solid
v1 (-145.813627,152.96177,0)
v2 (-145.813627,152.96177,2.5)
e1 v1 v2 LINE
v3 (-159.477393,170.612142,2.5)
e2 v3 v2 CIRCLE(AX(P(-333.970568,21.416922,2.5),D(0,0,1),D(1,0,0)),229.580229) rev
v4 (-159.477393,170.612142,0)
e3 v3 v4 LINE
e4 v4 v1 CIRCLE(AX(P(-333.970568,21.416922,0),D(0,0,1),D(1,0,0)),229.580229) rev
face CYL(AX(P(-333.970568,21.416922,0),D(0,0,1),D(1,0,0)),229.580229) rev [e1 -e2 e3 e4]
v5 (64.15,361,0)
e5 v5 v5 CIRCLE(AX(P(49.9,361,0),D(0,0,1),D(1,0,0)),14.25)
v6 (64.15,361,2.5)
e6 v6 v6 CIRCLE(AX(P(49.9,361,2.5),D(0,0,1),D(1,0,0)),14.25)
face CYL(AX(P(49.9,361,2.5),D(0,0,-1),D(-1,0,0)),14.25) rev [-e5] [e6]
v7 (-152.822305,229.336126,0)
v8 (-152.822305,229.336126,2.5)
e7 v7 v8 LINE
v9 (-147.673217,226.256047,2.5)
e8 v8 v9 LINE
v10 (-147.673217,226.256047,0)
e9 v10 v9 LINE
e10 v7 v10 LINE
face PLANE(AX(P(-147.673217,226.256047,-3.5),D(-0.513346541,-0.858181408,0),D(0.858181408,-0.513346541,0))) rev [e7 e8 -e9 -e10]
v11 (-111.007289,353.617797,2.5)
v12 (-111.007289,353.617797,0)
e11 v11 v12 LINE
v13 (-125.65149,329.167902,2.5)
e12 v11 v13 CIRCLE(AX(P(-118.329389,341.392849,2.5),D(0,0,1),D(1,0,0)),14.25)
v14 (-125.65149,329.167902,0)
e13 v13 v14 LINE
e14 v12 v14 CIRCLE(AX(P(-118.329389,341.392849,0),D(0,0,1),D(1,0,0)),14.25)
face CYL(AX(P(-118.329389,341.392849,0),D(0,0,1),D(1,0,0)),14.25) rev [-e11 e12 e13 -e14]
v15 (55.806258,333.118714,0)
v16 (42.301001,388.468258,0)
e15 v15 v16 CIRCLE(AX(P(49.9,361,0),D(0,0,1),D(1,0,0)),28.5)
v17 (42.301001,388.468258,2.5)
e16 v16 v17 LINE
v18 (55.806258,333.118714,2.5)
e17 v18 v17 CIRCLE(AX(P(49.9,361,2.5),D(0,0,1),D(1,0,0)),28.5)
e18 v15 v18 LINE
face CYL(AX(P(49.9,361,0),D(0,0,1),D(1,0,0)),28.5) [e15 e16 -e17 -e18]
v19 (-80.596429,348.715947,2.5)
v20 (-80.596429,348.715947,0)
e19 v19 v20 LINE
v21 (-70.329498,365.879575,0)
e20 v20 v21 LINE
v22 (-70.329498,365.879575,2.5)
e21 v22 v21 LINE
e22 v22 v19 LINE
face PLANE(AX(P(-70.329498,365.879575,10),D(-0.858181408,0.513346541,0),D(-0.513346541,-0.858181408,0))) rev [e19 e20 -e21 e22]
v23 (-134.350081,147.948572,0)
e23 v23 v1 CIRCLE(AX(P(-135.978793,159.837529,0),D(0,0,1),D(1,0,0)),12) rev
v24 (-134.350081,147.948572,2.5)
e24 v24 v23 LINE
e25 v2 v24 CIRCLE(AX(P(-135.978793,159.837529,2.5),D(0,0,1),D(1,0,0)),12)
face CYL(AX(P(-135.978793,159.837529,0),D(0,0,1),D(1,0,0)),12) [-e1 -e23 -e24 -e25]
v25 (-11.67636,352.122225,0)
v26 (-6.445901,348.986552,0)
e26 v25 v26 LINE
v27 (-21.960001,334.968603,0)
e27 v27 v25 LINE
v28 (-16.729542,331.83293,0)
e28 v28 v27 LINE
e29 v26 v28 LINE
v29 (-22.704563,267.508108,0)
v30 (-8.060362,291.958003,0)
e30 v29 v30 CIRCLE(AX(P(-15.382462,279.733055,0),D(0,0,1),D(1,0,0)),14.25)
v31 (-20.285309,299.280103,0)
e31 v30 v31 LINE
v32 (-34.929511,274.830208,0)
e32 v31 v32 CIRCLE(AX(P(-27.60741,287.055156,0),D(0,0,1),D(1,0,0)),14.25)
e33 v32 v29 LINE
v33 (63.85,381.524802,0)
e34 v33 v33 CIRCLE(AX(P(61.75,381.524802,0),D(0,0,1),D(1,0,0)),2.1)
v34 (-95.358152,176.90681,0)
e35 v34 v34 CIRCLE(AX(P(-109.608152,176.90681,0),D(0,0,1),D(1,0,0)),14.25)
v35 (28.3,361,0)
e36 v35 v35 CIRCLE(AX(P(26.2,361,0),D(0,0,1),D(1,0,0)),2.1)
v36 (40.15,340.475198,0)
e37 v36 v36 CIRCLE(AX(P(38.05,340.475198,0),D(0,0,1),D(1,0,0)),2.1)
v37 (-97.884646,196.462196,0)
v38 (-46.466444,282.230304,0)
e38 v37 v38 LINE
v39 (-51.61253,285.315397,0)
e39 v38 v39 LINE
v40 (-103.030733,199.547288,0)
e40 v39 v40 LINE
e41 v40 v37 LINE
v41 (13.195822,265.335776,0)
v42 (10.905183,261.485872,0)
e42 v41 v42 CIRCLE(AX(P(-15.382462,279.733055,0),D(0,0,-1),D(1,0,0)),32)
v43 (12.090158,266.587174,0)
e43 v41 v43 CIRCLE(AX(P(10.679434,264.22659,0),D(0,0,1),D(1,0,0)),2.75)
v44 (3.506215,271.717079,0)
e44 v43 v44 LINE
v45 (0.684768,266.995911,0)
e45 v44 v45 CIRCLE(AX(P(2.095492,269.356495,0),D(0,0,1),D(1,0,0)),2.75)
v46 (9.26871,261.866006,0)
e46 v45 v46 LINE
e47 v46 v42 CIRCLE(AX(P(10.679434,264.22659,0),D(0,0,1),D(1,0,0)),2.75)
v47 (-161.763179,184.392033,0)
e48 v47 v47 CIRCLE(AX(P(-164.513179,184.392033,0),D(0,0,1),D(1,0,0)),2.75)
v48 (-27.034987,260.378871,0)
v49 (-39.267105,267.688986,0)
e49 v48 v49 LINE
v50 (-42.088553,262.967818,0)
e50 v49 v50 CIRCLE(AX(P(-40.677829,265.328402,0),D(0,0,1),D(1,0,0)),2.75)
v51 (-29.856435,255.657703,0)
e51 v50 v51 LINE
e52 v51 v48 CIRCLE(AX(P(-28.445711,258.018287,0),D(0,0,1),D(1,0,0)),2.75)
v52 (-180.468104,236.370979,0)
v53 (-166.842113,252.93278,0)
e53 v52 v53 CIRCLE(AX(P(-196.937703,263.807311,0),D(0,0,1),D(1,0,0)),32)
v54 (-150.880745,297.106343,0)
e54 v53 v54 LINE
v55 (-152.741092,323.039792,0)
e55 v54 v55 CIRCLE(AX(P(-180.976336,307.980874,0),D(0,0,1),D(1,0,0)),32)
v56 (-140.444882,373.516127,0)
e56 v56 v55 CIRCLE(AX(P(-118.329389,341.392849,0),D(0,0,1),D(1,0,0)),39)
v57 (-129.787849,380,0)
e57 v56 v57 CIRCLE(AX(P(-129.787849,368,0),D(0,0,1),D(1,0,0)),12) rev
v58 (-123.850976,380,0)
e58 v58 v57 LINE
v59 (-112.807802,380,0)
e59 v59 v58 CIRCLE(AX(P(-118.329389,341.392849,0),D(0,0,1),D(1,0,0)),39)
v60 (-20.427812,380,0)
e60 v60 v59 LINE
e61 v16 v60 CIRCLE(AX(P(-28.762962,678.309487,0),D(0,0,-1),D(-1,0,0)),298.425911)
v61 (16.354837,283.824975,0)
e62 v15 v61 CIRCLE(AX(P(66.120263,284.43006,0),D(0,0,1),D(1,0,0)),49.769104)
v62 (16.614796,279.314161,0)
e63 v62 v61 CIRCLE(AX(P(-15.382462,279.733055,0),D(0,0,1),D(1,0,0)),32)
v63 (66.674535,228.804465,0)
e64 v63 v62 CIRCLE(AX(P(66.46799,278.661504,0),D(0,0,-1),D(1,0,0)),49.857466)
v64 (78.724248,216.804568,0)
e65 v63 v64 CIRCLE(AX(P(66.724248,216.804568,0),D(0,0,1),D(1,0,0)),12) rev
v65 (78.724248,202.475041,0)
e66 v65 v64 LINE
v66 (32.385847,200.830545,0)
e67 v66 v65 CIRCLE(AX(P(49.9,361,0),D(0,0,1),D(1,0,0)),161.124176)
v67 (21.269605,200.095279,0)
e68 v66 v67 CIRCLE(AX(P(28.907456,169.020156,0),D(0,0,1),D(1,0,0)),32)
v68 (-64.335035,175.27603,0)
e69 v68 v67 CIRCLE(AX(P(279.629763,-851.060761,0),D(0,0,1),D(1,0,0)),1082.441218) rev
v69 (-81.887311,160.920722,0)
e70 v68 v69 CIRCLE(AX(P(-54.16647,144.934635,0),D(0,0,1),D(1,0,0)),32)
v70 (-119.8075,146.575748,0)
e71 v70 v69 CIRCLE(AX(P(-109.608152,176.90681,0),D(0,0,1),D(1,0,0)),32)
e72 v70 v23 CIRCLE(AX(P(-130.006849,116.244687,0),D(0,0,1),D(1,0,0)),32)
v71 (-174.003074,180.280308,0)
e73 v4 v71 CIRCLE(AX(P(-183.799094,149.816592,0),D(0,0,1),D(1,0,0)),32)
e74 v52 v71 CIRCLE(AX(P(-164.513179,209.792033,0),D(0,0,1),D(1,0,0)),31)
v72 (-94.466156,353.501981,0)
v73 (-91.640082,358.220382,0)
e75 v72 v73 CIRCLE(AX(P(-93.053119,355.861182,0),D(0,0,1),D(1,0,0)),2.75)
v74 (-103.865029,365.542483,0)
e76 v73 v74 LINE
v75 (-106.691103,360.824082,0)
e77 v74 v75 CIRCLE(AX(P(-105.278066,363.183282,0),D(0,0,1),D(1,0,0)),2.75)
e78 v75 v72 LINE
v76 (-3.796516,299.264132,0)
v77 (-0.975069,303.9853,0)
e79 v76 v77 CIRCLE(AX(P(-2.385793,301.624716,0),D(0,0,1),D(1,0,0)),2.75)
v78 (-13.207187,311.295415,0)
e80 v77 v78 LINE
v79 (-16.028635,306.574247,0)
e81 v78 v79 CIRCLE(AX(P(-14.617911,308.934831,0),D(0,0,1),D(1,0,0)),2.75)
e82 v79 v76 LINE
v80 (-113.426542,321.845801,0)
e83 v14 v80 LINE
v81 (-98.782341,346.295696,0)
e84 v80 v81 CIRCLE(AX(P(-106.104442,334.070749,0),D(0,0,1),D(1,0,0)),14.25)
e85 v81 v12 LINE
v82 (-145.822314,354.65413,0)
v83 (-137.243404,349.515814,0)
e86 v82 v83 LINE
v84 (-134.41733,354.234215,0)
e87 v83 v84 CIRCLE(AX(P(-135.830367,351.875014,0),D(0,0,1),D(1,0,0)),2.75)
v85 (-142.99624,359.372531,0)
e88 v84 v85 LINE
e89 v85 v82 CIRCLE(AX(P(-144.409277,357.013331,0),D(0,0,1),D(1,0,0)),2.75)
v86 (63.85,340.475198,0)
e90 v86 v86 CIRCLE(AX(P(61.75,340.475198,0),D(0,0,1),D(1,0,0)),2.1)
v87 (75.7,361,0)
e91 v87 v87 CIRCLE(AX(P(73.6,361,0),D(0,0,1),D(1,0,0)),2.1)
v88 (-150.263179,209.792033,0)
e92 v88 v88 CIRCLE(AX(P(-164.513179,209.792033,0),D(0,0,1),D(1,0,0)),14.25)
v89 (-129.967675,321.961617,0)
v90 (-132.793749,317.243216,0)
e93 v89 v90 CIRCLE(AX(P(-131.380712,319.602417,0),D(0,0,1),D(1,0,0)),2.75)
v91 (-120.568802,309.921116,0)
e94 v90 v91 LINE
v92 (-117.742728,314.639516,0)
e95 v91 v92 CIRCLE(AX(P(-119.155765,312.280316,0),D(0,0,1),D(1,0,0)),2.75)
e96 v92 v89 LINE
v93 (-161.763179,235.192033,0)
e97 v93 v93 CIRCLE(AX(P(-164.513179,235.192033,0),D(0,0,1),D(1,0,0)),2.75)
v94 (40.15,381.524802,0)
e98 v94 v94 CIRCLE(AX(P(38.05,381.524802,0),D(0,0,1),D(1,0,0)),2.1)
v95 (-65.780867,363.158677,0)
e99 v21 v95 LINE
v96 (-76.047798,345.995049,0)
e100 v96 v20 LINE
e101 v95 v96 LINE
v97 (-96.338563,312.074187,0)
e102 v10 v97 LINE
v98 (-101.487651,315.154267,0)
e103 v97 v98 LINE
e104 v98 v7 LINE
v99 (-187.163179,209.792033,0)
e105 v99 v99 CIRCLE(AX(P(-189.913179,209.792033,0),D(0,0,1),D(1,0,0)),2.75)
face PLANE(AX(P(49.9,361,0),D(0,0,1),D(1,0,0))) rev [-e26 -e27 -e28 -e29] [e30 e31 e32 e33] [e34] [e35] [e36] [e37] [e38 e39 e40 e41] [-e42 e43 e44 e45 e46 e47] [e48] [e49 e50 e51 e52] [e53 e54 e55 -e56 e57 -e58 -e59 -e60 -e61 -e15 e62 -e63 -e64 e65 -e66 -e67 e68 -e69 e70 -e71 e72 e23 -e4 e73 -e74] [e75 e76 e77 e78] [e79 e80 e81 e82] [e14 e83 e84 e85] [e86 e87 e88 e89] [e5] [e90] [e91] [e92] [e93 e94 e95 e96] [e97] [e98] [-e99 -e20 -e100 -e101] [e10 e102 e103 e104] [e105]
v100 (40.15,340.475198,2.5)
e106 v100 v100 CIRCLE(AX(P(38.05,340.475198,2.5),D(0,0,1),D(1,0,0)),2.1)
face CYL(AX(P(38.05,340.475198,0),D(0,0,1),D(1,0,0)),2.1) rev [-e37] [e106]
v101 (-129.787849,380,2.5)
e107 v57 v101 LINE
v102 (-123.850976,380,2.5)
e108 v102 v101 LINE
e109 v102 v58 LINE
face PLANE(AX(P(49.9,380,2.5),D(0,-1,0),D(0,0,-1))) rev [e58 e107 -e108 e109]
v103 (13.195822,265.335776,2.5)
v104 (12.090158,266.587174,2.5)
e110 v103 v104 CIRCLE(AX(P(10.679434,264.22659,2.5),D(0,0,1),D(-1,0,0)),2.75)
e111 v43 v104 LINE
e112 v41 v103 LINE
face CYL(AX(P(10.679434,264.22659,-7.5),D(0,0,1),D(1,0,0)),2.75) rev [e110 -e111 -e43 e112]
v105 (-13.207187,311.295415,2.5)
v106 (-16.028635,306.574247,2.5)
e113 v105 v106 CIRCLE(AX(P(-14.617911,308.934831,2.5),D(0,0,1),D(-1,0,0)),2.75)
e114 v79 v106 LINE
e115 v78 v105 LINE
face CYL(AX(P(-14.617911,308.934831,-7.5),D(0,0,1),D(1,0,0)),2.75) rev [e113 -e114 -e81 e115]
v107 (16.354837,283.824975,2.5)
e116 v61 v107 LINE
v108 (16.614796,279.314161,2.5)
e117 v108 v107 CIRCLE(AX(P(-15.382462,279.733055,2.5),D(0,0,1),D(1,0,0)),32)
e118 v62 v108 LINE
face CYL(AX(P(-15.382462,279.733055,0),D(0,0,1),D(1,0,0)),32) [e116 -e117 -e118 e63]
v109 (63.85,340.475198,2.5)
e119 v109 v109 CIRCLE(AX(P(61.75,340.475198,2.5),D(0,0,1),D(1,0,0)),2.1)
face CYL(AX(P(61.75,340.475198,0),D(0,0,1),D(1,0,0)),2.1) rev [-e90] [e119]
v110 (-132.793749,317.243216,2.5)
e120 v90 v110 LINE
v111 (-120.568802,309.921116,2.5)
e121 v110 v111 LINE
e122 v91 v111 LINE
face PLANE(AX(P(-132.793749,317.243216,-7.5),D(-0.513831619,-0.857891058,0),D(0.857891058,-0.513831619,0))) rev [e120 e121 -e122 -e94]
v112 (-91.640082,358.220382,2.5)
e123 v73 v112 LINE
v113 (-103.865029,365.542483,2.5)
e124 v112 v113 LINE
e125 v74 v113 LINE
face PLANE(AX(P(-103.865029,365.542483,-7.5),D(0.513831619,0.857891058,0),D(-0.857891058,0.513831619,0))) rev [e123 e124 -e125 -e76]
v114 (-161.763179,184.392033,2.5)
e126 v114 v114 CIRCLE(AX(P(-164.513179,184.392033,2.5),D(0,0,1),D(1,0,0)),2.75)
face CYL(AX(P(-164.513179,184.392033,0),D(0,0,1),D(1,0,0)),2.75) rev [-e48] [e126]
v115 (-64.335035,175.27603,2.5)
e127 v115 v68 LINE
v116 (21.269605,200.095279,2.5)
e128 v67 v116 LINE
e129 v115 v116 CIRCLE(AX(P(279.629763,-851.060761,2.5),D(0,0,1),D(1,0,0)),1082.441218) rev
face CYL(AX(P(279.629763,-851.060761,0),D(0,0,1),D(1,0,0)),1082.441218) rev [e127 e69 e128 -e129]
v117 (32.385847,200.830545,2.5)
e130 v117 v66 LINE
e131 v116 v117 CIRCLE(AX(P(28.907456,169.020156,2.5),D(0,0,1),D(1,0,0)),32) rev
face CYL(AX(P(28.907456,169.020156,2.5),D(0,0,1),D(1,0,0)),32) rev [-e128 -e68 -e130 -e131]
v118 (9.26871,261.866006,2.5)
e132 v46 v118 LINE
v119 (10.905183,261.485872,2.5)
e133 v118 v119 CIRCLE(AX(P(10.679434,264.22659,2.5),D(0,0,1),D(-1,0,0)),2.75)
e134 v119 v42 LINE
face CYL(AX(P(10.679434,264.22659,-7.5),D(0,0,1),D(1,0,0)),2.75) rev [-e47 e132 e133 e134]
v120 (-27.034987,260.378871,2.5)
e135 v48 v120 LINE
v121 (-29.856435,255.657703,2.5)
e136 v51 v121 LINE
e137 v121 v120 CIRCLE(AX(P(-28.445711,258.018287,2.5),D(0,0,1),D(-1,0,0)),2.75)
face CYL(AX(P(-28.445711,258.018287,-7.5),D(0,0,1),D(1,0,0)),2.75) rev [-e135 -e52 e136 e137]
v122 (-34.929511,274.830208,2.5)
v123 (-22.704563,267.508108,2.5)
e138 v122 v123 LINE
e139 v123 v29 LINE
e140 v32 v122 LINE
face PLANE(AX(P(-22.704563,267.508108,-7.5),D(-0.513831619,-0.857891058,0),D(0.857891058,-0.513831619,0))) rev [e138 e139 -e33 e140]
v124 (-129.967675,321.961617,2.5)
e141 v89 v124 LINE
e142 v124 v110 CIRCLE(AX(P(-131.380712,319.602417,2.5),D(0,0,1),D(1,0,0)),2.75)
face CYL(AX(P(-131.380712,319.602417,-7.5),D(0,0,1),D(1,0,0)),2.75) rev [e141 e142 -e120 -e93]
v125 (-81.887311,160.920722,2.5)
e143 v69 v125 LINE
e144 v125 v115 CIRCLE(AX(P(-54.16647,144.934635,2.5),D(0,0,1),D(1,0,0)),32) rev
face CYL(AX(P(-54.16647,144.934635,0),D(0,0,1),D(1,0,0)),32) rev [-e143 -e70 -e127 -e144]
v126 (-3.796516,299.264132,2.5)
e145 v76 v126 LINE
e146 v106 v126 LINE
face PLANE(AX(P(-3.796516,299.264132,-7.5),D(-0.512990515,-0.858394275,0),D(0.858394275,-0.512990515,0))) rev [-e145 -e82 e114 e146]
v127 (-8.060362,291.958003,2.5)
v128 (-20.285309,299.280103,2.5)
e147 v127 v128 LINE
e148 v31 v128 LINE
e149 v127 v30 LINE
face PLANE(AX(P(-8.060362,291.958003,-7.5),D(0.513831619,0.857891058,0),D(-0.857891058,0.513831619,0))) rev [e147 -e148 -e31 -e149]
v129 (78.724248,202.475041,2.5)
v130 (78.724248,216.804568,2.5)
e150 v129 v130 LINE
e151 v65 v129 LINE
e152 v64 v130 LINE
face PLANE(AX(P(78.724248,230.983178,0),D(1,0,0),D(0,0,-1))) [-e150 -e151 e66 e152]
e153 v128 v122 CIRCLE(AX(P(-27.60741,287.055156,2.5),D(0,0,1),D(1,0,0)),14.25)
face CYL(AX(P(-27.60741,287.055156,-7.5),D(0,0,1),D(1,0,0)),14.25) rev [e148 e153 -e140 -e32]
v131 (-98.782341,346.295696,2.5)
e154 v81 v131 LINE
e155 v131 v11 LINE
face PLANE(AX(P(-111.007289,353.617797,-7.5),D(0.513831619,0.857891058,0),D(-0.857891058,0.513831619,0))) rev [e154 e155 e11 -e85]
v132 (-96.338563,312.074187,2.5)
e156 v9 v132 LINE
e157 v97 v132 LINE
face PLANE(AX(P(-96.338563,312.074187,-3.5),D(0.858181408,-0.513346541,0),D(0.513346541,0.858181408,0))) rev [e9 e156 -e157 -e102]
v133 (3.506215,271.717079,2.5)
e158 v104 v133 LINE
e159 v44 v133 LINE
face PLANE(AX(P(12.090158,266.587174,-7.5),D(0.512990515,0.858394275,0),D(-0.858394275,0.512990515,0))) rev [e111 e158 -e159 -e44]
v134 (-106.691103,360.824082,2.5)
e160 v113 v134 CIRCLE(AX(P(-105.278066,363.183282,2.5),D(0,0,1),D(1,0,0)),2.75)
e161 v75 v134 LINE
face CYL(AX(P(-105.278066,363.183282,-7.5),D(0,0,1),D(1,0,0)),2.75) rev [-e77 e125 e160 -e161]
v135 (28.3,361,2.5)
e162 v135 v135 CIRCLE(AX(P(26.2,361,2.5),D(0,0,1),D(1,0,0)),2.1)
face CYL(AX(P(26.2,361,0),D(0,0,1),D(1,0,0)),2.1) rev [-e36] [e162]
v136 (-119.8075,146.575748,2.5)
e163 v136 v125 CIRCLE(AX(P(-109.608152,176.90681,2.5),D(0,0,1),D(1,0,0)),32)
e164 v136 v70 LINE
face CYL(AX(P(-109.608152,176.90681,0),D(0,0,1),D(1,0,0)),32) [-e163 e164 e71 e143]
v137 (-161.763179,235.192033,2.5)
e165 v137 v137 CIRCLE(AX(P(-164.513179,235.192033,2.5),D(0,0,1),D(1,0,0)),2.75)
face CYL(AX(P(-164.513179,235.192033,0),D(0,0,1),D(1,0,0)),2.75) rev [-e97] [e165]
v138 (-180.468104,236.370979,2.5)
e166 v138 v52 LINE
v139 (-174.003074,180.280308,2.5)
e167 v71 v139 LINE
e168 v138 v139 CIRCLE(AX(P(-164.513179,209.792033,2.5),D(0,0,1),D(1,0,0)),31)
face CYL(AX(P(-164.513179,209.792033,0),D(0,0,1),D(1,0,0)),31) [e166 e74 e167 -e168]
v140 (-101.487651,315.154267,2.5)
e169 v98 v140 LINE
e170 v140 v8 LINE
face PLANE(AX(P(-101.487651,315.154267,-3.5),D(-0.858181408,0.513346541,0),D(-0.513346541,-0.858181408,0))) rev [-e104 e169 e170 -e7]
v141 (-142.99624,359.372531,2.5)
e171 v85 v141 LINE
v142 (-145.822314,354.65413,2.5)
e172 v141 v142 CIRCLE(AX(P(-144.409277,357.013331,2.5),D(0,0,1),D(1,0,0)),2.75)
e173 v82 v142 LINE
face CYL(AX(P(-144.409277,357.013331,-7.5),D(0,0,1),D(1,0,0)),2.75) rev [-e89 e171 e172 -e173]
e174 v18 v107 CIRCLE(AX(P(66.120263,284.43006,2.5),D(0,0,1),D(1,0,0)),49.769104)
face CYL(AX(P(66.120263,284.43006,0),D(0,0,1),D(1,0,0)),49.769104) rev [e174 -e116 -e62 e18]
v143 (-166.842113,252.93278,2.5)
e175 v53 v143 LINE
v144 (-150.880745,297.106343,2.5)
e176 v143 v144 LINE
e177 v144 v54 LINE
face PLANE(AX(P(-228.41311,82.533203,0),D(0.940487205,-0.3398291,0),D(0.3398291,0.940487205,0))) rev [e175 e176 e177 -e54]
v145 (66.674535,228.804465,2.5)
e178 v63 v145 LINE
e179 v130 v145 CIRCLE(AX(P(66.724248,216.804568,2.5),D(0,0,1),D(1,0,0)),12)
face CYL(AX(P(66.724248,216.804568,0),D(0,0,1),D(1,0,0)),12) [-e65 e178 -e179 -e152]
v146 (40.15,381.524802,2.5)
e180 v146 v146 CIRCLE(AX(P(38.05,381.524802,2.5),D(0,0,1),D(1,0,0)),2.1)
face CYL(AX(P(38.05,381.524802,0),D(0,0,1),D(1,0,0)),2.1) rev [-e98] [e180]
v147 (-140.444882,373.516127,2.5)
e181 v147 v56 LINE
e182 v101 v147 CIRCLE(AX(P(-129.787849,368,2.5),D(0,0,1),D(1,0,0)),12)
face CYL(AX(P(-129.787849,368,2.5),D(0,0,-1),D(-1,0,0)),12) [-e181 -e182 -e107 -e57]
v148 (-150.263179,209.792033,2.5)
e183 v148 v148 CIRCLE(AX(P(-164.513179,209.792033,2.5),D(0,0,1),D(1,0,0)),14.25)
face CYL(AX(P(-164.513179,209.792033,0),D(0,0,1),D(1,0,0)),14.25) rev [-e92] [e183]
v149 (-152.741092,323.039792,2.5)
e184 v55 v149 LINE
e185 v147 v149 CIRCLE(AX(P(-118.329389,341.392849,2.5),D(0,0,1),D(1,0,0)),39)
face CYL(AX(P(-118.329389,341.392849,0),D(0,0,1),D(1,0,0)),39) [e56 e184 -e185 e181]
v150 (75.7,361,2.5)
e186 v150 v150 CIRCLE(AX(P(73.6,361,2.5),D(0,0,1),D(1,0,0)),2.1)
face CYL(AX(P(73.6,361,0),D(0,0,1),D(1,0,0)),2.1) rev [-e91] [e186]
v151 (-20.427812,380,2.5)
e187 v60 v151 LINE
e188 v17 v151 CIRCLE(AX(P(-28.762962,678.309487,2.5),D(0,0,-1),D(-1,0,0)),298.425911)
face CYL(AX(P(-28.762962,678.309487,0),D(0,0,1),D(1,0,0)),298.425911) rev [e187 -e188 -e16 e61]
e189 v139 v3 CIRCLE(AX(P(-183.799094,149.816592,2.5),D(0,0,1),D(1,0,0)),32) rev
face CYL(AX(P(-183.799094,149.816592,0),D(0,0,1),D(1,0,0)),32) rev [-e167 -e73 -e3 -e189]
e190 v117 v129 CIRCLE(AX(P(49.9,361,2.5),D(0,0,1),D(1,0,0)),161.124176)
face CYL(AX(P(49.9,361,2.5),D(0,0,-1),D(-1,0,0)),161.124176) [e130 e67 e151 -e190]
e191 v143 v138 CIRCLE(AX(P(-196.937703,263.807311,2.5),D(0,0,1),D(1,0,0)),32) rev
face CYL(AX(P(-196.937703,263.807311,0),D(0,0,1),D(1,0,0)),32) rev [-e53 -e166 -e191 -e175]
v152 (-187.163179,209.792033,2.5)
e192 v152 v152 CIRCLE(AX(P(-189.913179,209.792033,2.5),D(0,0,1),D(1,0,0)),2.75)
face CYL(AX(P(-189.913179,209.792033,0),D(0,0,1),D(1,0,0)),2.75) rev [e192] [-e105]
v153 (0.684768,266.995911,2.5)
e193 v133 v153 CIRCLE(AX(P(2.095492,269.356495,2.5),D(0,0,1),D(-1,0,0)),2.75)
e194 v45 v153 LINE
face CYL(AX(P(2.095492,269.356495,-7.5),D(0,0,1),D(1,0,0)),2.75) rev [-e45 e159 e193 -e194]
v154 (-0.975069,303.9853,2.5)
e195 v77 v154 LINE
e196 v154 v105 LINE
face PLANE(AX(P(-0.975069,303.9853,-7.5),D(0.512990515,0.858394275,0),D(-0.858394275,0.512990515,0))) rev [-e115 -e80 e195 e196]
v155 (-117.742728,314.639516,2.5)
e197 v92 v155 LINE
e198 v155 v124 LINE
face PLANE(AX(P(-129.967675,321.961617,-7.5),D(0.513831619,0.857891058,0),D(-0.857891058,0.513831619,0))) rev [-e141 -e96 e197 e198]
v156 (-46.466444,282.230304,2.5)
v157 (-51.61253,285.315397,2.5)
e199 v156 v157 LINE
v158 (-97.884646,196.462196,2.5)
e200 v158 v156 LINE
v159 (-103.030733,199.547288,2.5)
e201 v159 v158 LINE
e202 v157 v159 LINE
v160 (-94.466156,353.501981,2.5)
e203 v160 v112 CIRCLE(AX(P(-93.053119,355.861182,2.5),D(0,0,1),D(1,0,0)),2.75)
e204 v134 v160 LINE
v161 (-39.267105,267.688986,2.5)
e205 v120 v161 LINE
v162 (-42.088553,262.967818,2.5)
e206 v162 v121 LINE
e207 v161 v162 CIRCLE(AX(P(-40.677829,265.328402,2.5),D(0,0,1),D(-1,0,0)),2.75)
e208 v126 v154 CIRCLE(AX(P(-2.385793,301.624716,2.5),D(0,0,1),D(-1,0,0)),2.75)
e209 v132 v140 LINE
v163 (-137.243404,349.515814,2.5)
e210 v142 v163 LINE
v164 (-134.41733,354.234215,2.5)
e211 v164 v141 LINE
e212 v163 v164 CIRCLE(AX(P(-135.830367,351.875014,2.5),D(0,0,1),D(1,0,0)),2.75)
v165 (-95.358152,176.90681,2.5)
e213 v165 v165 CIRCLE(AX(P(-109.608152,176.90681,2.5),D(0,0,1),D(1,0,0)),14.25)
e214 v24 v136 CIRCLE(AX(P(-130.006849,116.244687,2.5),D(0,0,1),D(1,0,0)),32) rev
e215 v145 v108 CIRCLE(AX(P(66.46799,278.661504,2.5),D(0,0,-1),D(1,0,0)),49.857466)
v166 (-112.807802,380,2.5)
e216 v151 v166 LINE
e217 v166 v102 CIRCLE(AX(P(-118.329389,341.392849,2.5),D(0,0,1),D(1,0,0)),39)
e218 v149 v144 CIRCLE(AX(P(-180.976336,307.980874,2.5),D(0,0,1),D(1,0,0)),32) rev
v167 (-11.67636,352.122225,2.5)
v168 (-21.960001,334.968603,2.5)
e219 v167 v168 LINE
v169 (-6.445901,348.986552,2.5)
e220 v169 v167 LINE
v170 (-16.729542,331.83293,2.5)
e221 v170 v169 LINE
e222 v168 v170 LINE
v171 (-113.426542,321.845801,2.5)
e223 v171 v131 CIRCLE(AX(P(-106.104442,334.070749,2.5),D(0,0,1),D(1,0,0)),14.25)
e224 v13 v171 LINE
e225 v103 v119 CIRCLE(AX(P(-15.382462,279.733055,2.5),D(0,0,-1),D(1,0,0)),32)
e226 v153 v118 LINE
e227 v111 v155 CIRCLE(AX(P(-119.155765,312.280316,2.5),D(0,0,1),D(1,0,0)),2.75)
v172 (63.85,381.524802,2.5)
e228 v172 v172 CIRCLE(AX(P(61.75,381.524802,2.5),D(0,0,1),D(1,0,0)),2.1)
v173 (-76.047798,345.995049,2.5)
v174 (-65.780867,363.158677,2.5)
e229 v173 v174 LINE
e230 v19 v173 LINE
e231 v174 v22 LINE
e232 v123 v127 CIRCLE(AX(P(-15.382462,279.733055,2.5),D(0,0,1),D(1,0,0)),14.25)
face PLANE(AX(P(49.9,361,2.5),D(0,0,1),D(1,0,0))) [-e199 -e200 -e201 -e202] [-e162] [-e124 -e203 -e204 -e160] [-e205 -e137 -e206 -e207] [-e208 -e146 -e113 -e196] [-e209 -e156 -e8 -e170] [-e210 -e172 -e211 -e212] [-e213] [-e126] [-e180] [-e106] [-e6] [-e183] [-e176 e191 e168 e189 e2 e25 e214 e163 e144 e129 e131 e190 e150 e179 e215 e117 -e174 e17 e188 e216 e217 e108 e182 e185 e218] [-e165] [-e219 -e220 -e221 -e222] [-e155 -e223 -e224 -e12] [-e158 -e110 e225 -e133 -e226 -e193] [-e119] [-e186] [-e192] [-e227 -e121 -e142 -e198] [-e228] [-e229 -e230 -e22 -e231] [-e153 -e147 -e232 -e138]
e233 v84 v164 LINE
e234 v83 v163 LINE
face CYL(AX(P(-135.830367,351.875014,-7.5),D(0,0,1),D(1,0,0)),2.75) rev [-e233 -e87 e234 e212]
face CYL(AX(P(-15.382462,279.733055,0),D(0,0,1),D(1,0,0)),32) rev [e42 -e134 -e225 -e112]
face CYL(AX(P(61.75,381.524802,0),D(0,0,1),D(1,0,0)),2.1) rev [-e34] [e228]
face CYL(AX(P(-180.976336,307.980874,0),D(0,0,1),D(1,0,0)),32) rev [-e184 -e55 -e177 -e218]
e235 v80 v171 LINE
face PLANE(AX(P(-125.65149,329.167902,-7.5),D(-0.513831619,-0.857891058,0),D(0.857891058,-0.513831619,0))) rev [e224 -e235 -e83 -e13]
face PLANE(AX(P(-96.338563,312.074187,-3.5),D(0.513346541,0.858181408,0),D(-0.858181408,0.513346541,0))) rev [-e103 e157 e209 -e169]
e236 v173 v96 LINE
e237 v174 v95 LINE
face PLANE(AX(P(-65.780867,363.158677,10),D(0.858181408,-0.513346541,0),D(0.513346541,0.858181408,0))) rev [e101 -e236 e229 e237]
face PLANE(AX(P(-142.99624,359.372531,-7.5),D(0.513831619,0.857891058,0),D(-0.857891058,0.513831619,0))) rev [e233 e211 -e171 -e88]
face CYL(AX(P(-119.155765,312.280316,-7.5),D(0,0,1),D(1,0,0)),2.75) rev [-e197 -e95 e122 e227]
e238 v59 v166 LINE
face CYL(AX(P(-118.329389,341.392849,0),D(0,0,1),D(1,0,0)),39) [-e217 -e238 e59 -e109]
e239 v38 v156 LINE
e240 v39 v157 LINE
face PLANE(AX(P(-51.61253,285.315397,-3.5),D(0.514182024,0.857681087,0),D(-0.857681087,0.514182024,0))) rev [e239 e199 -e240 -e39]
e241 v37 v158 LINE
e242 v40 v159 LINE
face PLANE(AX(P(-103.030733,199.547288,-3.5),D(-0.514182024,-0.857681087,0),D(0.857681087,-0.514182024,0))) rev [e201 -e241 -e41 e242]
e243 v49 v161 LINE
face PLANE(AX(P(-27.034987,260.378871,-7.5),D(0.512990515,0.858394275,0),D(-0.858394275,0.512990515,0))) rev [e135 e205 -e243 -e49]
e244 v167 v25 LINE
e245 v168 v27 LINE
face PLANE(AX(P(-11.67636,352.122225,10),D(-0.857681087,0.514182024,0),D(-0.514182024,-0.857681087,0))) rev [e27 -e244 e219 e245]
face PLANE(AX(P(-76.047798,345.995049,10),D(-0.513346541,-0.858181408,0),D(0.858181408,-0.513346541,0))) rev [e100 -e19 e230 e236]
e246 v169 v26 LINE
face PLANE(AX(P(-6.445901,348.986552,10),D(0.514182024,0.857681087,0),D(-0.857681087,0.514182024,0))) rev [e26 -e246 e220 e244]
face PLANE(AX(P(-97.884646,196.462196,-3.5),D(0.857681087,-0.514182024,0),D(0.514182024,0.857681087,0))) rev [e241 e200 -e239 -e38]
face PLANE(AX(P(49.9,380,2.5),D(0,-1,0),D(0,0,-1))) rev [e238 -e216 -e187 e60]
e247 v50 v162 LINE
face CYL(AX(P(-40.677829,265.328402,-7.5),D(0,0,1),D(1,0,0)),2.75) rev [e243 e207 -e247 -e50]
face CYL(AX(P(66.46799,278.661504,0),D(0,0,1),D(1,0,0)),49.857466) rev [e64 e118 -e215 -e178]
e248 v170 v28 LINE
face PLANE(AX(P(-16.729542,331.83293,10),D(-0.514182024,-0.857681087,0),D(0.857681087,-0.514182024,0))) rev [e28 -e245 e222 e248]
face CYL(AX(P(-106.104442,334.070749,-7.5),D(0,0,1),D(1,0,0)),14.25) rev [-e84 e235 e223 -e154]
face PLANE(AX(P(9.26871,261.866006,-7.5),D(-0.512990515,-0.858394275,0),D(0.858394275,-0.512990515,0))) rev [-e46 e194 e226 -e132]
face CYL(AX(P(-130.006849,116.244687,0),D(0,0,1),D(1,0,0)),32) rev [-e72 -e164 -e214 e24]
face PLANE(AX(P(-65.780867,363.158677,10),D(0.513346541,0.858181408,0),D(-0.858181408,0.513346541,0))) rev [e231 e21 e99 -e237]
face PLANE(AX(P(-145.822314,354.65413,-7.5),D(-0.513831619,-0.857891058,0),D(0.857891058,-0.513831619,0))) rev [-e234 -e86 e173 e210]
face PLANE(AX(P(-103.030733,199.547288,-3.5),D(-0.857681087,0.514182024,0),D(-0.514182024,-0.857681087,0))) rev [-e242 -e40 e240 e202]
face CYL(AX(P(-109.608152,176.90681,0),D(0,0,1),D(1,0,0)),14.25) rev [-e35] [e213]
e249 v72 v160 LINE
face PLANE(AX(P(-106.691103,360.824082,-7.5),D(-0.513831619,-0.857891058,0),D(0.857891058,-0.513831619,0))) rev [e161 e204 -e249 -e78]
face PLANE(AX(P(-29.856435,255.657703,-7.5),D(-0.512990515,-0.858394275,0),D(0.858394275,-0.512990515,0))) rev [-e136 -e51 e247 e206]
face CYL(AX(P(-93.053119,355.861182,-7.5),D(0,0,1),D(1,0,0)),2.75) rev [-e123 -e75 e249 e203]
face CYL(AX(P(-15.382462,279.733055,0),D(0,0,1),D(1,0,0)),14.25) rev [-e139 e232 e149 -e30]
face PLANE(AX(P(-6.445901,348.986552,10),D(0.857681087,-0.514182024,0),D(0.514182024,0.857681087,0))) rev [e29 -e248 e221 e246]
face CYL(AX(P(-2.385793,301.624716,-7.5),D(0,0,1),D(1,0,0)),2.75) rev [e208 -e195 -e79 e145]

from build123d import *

# Parameters (mm, degrees)
ESBO_O1_R                 = 14.25
RESSALTO_EXTRUS_O1_DEPTH  = 2.5
RESSALTO_EXTRUS_O2_START  = -2.5
RESSALTO_EXTRUS_O2_DEPTH  = 2.5
RESSALTO_EXTRUS_O3_START  = -2.5
RESSALTO_EXTRUS_O3_DEPTH  = 2.5
ESBO_O6_R                 = 14.25
CORTE_EXTRUS_O2_DEPTH     = 424.44839444
ESBO_O8_R                 = 24.626006693
ESBO_O8_R_2               = 14.25
RESSALTO_EXTRUS_O4_DEPTH  = 2.5
FILETE1_R                 = 12
FILETE2_R                 = 12
FILETE3_R                 = 12
FILETE4_R                 = 12
ESBO_O9_R                 = 39
ESBO_O9_R_2               = 14.25
ESBO_O9_R_3               = 31
RESSALTO_EXTRUS_O5_DEPTH  = 2.5
ESBO_O10_R                = 2.75
CORTE_EXTRUS_O3_DEPTH     = 428.70360435
ESBO_O12_R                = 32
ESBO_O12_R_2              = 14.25
RESSALTO_EXTRUS_O6_DEPTH  = 2.5
CORTE_EXTRUS_O4_DEPTH     = 6
ESBO_O14_R                = 2.75
RESSALTO_EXTRUS_O7_DEPTH  = 2.5
CORTE_EXTRUS_O5_DEPTH     = 10
RESSALTO_EXTRUS_O8_START  = -2.5
ESBO_O16_R                = 28.5
ESBO_O16_R_2              = 14.25
RESSALTO_EXTRUS_O8_DEPTH  = 2.5
FILETE6_R                 = 12
FILETE7_R                 = 32
FILETE8_R                 = 12
FILETE9_R                 = 12
FILETE10_R                = 12
ESBO_O18_R                = 2.1
CORTE_EXTRUS_O7_DEPTH     = 436.823247896
CORTE_EXTRUS_O8_DEPTH     = 10
CORTE_EXTRUS_O9_DEPTH     = 10
RESSALTO_EXTRUS_O9_DEPTH  = 2.5
RESSALTO_EXTRUS_O10_START = -2.5
RESSALTO_EXTRUS_O10_DEPTH = 2.5
RESSALTO_EXTRUS_O11_DEPTH = 2.5


with BuildPart() as part:
    # Esboço1 → Ressalto-extrusão1 (new body)
    with BuildSketch(Plane.XY):
        with BuildLine():
            Line((49.9, 342), (-3.275752253, 342))
            Line((-3.275752253, 342), (-3.275752253, 208.903519527))
            ThreePointArc((-3.275752253, 208.903519527), (-86.772882258, 275.668158023), (-110.1, 380))
            Line((-110.1, 380), (49.9, 380))
            ThreePointArc((49.9, 380), (68.9, 361), (49.9, 342))
        make_face()
        with Locations((49.9, 361)):
            Circle(ESBO_O1_R, mode=Mode.SUBTRACT)
    extrude(amount=RESSALTO_EXTRUS_O1_DEPTH)

    # Esboço3 → Ressalto-extrusão2 (add)
    with BuildSketch(Plane.XY.offset(2.5).offset(RESSALTO_EXTRUS_O2_START)):
        with BuildLine():
            Line((78.724247747, 230.983178344), (78.724247747, 202.475040634))
            ThreePointArc((78.724247747, 202.475040634), (37.307133839, 200.368683869), (-3.275752253, 208.903519527))
            Line((-3.275752253, 208.903519527), (-3.275752253, 238.903519527))
            ThreePointArc((-3.275752253, 238.903519527), (37.096410892, 228.443297878), (78.724247747, 230.983178344))
        make_face()
    extrude(amount=RESSALTO_EXTRUS_O2_DEPTH)

    # Esboço5 → Ressalto-extrusão3 (add)
    with BuildSketch(Plane.XY.offset(2.5).offset(RESSALTO_EXTRUS_O3_START)):
        with BuildLine():
            ThreePointArc((27.063337232, 201.502392389), (-77.860167086, 262.82495375), (-110.1, 380))
            Line((-110.1, 380), (-141.93126047, 380))
            Line((-141.93126047, 380), (-141.262689275, 323.724600086))
            Line((-141.262689275, 323.724600086), (-186.821553236, 197.639080724))
            ThreePointArc((-186.821553236, 197.639080724), (-162.10673209, 173.633555912), (-141.262689275, 146.199754045))
            ThreePointArc((-141.262689275, 146.199754045), (-58.233094615, 177.300887798), (27.063337232, 201.502392389))
        make_face()
    extrude(amount=RESSALTO_EXTRUS_O3_DEPTH)

    # Esboço6 → Corte-extrusão2 (cut, through all)
    with BuildSketch(Plane.XY.offset(2.5)):
        with Locations((-118.329389294, 341.392849413)):
            Circle(ESBO_O6_R)
        with Locations((-15.382462369, 279.733055084)):
            Circle(ESBO_O6_R)
        with Locations((-164.513179324, 209.792033264)):
            Circle(ESBO_O6_R)
        with Locations((-109.608151631, 176.906809621)):
            Circle(ESBO_O6_R)
    extrude(amount=-CORTE_EXTRUS_O2_DEPTH, mode=Mode.SUBTRACT)

    # Esboço8 → Ressalto-extrusão4 (add)
    with BuildSketch(Plane.XY.offset(2.5)):
        with Locations((-164.513179324, 209.792033264)):
            Circle(ESBO_O8_R)
        with Locations((-164.513179324, 209.792033264)):
            Circle(ESBO_O8_R_2, mode=Mode.SUBTRACT)
    extrude(amount=-RESSALTO_EXTRUS_O4_DEPTH)

    # Filete1
    filete1_edges = [part.edges().sort_by_distance(p)[0] for p in [
        (-174.258497593, 232.407713167, 1.25),
    ]]
    fillet(filete1_edges, radius=FILETE1_R)

    # Filete2
    filete2_edges = [part.edges().sort_by_distance(p)[0] for p in [
        (-3.275752253, 238.903519527, 1.25),
        (-141.262689275, 323.724600086, 1.25),
        (-141.93126047, 380, 1.25),
    ]]
    fillet(filete2_edges, radius=FILETE2_R)

    # Filete3
    filete3_edges = [part.edges().sort_by_distance(p)[0] for p in [
        (78.724247747, 230.983178344, 1.25),
    ]]
    fillet(filete3_edges, radius=FILETE3_R)

    # Filete4
    filete4_edges = [part.edges().sort_by_distance(p)[0] for p in [
        (-3.275752253, 342, 1.25),
    ]]
    fillet(filete4_edges, radius=FILETE4_R)

    # Esboço9 → Ressalto-extrusão5 (add)
    # profile 1 of 2: a face of its own
    with BuildSketch(Plane.XY.offset(2.5)):
        with Locations((-118.329389294, 341.392849413)):
            Circle(ESBO_O9_R)
        with Locations((-118.329389294, 341.392849413)):
            Circle(ESBO_O9_R_2, mode=Mode.SUBTRACT)
    # profile 2 of 2: a face of its own
    with BuildSketch(Plane.XY.offset(2.5)):
        with Locations((-164.513179324, 209.792033264)):
            Circle(ESBO_O9_R_3)
        with Locations((-164.513179324, 209.792033264)):
            Circle(ESBO_O9_R_2, mode=Mode.SUBTRACT)
    extrude(amount=-RESSALTO_EXTRUS_O5_DEPTH)

    # Esboço10 → Corte-extrusão3 (cut, through all)
    with BuildSketch(Plane.XY.offset(2.5)):
        with Locations((-189.913179324, 209.792033264)):
            Circle(ESBO_O10_R)
        with Locations((-164.513179324, 235.192033264)):
            Circle(ESBO_O10_R)
        with Locations((-139.113179324, 209.792033264)):
            Circle(ESBO_O10_R)
        with Locations((-164.513179324, 184.392033264)):
            Circle(ESBO_O10_R)
    extrude(amount=-CORTE_EXTRUS_O3_DEPTH, mode=Mode.SUBTRACT)

    # Esboço12 → Ressalto-extrusão6 (add)
    # profile 1 of 2: a face of its own
    with BuildSketch(Plane.XY.offset(2.5)):
        with Locations((-109.608151631, 176.906809621)):
            Circle(ESBO_O12_R)
        with Locations((-109.608151631, 176.906809621)):
            Circle(ESBO_O12_R_2, mode=Mode.SUBTRACT)
    # profile 2 of 2: a face of its own
    with BuildSketch(Plane.XY.offset(2.5)):
        with Locations((-15.382462369, 279.733055084)):
            Circle(ESBO_O12_R)
        with Locations((-15.382462369, 279.733055084)):
            Circle(ESBO_O12_R_2, mode=Mode.SUBTRACT)
    extrude(amount=-RESSALTO_EXTRUS_O6_DEPTH)

    # Esboço13 → Corte-extrusão4 (cut)
    with BuildSketch(Plane.XY.offset(2.5)):
        Polygon((-96.338562846, 312.074187366), (-147.673216901, 226.25604655), (-152.82230535, 229.336125793), (-101.487651295, 315.154266609), align=None)
        Polygon((-103.03073276, 199.54728787), (-51.612530365, 285.315396526), (-46.466443845, 282.230304383), (-97.884646241, 196.462195727), align=None)
    extrude(amount=-CORTE_EXTRUS_O4_DEPTH, mode=Mode.SUBTRACT)

    # Esboço14 → Ressalto-extrusão7 (add)
    with BuildSketch(Plane.XY.offset(2.5)):
        with Locations((-139.113179324, 209.792033264)):
            Circle(ESBO_O14_R)
    extrude(amount=-RESSALTO_EXTRUS_O7_DEPTH)

    # Esboço15 → Corte-extrusão5 (cut)
    with BuildSketch(Plane(origin=(0, 0, 0), x_dir=(-1, 0, 0), z_dir=(0, 0, -1))):
        Polygon((6.445901446, 348.986551569), (16.729541925, 331.832929838), (21.960000657, 334.968603341), (11.676360178, 352.122225072), align=None)
        Polygon((65.780867258, 363.158677391), (76.047798069, 345.995049227), (80.596428549, 348.715946812), (70.329497738, 365.879574976), align=None)
    extrude(amount=-CORTE_EXTRUS_O5_DEPTH, mode=Mode.SUBTRACT)

    # Esboço16 → Ressalto-extrusão8 (add)
    with BuildSketch(Plane.XY.offset(2.5).offset(RESSALTO_EXTRUS_O8_START)):
        with Locations((49.9, 361)):
            Circle(ESBO_O16_R)
        with Locations((49.9, 361)):
            Circle(ESBO_O16_R_2, mode=Mode.SUBTRACT)
    extrude(amount=RESSALTO_EXTRUS_O8_DEPTH)

    # Filete6
    filete6_edges = [part.edges().sort_by_distance(p)[0] for p in [
        (28.657354214, 342, 1.25),
        (28.657354214, 380, 1.25),
    ]]
    fillet(filete6_edges, radius=FILETE6_R)

    # Filete7
    # the kernel refuses this fillet: 32 mm, written as the material it adds along each edge
    with BuildSketch(Plane(origin=(-145.119575988, 313.05055069, 0), x_dir=(-0.6065801455466366, 0.795022343729169, 0), z_dir=(0, 0, 1))) as filete7_piece_1:
        with BuildLine():
            CenterArc((17.719492192, 31.58209042), FILETE7_R, 212.790903827, 47.939142028)
            Line((-9.1813908, 14.251698207), (-9.71940846, 13.905090363))
            Line((-9.71940846, 13.905090363), (-0.53801766, -0.346607844))
            Line((-0.53801766, -0.346607844), (0.103095227, -0.631641808))
            ThreePointArc((0.103095227, -0.631641808), (6.282365413, -0.130672699), (12.4616356, -0.631641808))
            Line((12.4616356, -0.631641808), (12.564730827, 0))
        make_face()
    extrude(amount=2.5)
    with BuildSketch(Plane(origin=(-166.904490399, 178.884402631, 2.5), x_dir=(-0.9812085080555987, 0.1929504177743761, 0), z_dir=(0, 0, -1))) as filete7_piece_2:
        with BuildLine():
            CenterArc((10.968482395, -31.78140347), FILETE7_R, 96.700879529, 31.64298617)
            Line((-8.883667224, -6.683751079), (-9.280710216, -6.181798032))
            ThreePointArc((-9.280710216, -6.181798032), (-4.867069609, -2.776675692), (-0.372278024, 0.520585317))
            Line((-0.372278024, 0.520585317), (0.074679029, 0.635628069))
            ThreePointArc((0.074679029, 0.635628069), (3.617265471, 0.428234612), (7.159851912, 0.635628069))
            Line((7.159851912, 0.635628069), (7.234530941, 0))
        make_face()
    extrude(amount=2.5)
    with BuildSketch(Plane(origin=(-171.518737142, 239.990082201, 0), x_dir=(0.33982910043770986, 0.9404872048548544, 0), z_dir=(0, 0, 1))) as filete7_piece_3:
        with BuildLine():
            CenterArc((13.761694577, 32), FILETE7_R, 230.842195329, 39.157804671)
            Line((-6.444975037, 7.186888484), (-6.849108429, 6.690626254))
            ThreePointArc((-6.849108429, 6.690626254), (-3.417493232, 3.418569265), (-0.537190941, -0.347887758))
            Line((-0.537190941, -0.347887758), (0, -0.64))
            Line((0, -0.64), (13.761694577, -0.64))
            Line((13.761694577, -0.64), (13.761694577, 0))
        make_face()
    extrude(amount=2.5)
    with BuildSketch(Plane(origin=(-78.254961291, 170.505446051, 2.5), x_dir=(-0.3543782836205589, -0.9351021506221376, 0), z_dir=(0, 0, -1))) as filete7_piece_4:
        with BuildLine():
            CenterArc((15.37488281, -31.58693995), FILETE7_R, 99.215894786, 41.500784387)
            Line((-9.393903053, -11.325961521), (-9.88927877, -10.920741953))
            ThreePointArc((-9.88927877, -10.920741953), (-5.208807395, -5.238440699), (-0.489821515, 0.411916113))
            Line((-0.489821515, 0.411916113), (0.102499219, 0.631738799))
            ThreePointArc((0.102499219, 0.631738799), (5.124960937, 0.22693995), (10.147422654, 0.631738799))
            Line((10.147422654, 0.631738799), (10.249921873, 0))
        make_face()
    extrude(amount=2.5)
    with BuildSketch(Plane(origin=(-128.858382026, 151.34455953, 2.5), x_dir=(-0.9237011092502482, -0.3831139005176673, 0), z_dir=(0, 0, -1))) as filete7_piece_5:
        with BuildLine():
            CenterArc((14.50808926, -31.981797811), FILETE7_R, 91.932613611, 39.180201641)
            Line((-6.533311624, -7.87247495), (-6.954139642, -7.390288493))
            ThreePointArc((-6.954139642, -7.390288493), (-3.442511767, -3.790295854), (-0.55149425, 0.324736958))
            Line((-0.55149425, 0.324736958), (-0.003969965, 0.639987687))
            ThreePointArc((-0.003969965, 0.639987687), (6.714459431, 0.660825334), (13.407335454, 0.639635956))
            Line((13.407335454, 0.639635956), (13.428918862, 0))
        make_face()
    extrude(amount=2.5)
    with BuildSketch(Plane(origin=(27.063337232, 201.502392389, 0), x_dir=(-0.971751230176269, -0.23600751397128825, 0), z_dir=(0, 0, 1))) as filete7_piece_6:
        with BuildLine():
            CenterArc((5.874027095, 31.999878645), FILETE7_R, 250.108614679, 20.049179947)
            Line((-5.013594338, 1.909021237), (-5.231346767, 1.307204089))
            ThreePointArc((-5.231346767, 1.307204089), (-2.726592558, 0.377269834), (-0.237666885, -0.594234341))
            Line((-0.237666885, -0.594234341), (-0.001762581, -0.639997573))
            ThreePointArc((-0.001762581, -0.639997573), (2.981078064, -0.644105), (5.963918709, -0.639997573))
            Line((5.963918709, -0.639997573), (5.962156129, 0))
        make_face()
    extrude(amount=2.5)

    # Filete8
    # the kernel refuses this fillet: 12 mm, written as the material it adds along each edge
    with BuildSketch(Plane(origin=(-3.275752253, 250.111651164, 0), x_dir=(0.891196029676298, 0.4536183822214474, 0), z_dir=(0, 0, 1))) as filete8_piece_1:
        with BuildLine():
            CenterArc((6.287483176, -11.958863934), FILETE8_R, 94.745506014, 35.06044637)
            Line((-1.394790968, -2.740259702), (-1.548436451, -2.555887618))
            ThreePointArc((-1.548436451, -2.555887618), (-0.911282531, -1.261261439), (-0.213887047, 0.108868412))
            Line((-0.213887047, 0.108868412), (0.01985521, 0.239177279))
            ThreePointArc((0.01985521, 0.239177279), (2.647361337, 0.130303823), (5.274867464, 0.239177279))
            Line((5.274867464, 0.239177279), (5.294722674, 0))
        make_face()
    extrude(amount=2.5)

    # Filete9
    filete9_edges = [part.edges().sort_by_distance(p)[0] for p in [
        (-3.275752253, 309.354459004, 1.25),
    ]]
    fillet(filete9_edges, radius=FILETE9_R)

    # Filete10
    filete10_edges = [part.edges().sort_by_distance(p)[0] for p in [
        (-141.262689275, 146.199754045, 1.25),
    ]]
    fillet(filete10_edges, radius=FILETE10_R)

    # Esboço18 → Corte-extrusão7 (cut, through all)
    with BuildSketch(Plane.XY.offset(2.5)):
        with Locations((38.05, 381.52480207)):
            Circle(ESBO_O18_R)
        with Locations((61.75, 381.52480207)):
            Circle(ESBO_O18_R)
        with Locations((73.6, 361)):
            Circle(ESBO_O18_R)
        with Locations((26.2, 361)):
            Circle(ESBO_O18_R)
        with Locations((38.05, 340.47519793)):
            Circle(ESBO_O18_R)
        with Locations((61.75, 340.47519793)):
            Circle(ESBO_O18_R)
    extrude(amount=-CORTE_EXTRUS_O7_DEPTH, mode=Mode.SUBTRACT)

    # Esboço19 → Corte-extrusão8 (cut)
    with BuildSketch(Plane.XY.offset(2.5)):
        with BuildLine():
            Line((-111.007288718, 353.617796985), (-98.782341146, 346.295696409))
            ThreePointArc((-98.782341146, 346.295696409), (-93.87949415, 326.74864826), (-113.426542299, 321.845801264))
            Line((-113.426542299, 321.845801264), (-125.651489871, 329.167901841))
            ThreePointArc((-125.651489871, 329.167901841), (-130.554336867, 348.714949989), (-111.007288718, 353.617796985))
        make_face()
        with BuildLine():
            Line((-22.704562946, 267.508107512), (-34.929510518, 274.830208088))
            ThreePointArc((-34.929510518, 274.830208088), (-39.832357514, 294.377256237), (-20.285309365, 299.280103233))
            Line((-20.285309365, 299.280103233), (-8.060361793, 291.958002656))
            ThreePointArc((-8.060361793, 291.958002656), (-3.157514797, 272.410954507), (-22.704562946, 267.508107512))
        make_face()
    extrude(amount=-CORTE_EXTRUS_O8_DEPTH, mode=Mode.SUBTRACT)

    # Esboço20 → Corte-extrusão9 (cut)
    with BuildSketch(Plane.XY.offset(2.5)):
        with BuildLine():
            Line((-103.865029208, 365.542482687), (-91.640081636, 358.220382111))
            ThreePointArc((-91.640081636, 358.220382111), (-90.69391818, 354.448144749), (-94.466155543, 353.501981293))
            Line((-94.466155543, 353.501981293), (-106.691103115, 360.82408187))
            ThreePointArc((-106.691103115, 360.82408187), (-107.63726657, 364.596319232), (-103.865029208, 365.542482687))
        make_face()
        with BuildLine():
            Line((-142.996240495, 359.372531052), (-134.417329918, 354.234214858))
            ThreePointArc((-134.417329918, 354.234214858), (-133.471166463, 350.461977495), (-137.243403825, 349.51581404))
            Line((-137.243403825, 349.51581404), (-145.822314402, 354.654130234))
            ThreePointArc((-145.822314402, 354.654130234), (-146.768477858, 358.426367596), (-142.996240495, 359.372531052))
        make_face()
        with BuildLine():
            Line((-129.967675474, 321.961616956), (-117.742727902, 314.639516379))
            ThreePointArc((-117.742727902, 314.639516379), (-116.796564446, 310.867279017), (-120.568801808, 309.921115562))
            Line((-120.568801808, 309.921115562), (-132.793749381, 317.243216138))
            ThreePointArc((-132.793749381, 317.243216138), (-133.739912836, 321.0154535), (-129.967675474, 321.961616956))
        make_face()
        with BuildLine():
            Line((12.090158242, 266.587174222), (3.506215493, 271.717079375))
            ThreePointArc((3.506215493, 271.717079375), (-0.26509268, 270.767219035), (0.684767659, 266.995910862))
            Line((0.684767659, 266.995910862), (9.268710408, 261.86600571))
            ThreePointArc((9.268710408, 261.86600571), (13.040018581, 262.815866049), (12.090158242, 266.587174222))
        make_face()
        with BuildLine():
            Line((-27.034986804, 260.378871303), (-39.267105222, 267.688986145))
            ThreePointArc((-39.267105222, 267.688986145), (-43.038413395, 266.739125806), (-42.088553056, 262.967817633))
            Line((-42.088553056, 262.967817633), (-29.856434638, 255.657702791))
            ThreePointArc((-29.856434638, 255.657702791), (-26.085126465, 256.60756313), (-27.034986804, 260.378871303))
        make_face()
        with BuildLine():
            Line((-0.975068628, 303.985300469), (-13.207187046, 311.295415312))
            ThreePointArc((-13.207187046, 311.295415312), (-16.978495219, 310.345554973), (-16.02863488, 306.5742468))
            Line((-16.02863488, 306.5742468), (-3.796516462, 299.264131957))
            ThreePointArc((-3.796516462, 299.264131957), (-0.025208289, 300.213992296), (-0.975068628, 303.985300469))
        make_face()
    extrude(amount=-CORTE_EXTRUS_O9_DEPTH, mode=Mode.SUBTRACT)

    # Esboço21 → Ressalto-extrusão9 (add)
    with BuildSketch(Plane.XY.offset(2.5)):
        with BuildLine():
            ThreePointArc((16.614795754, 279.314160594), (31.056060262, 243.565034213), (66.674535232, 228.804465169))
            ThreePointArc((66.674535232, 228.804465169), (35.088549451, 227.170075902), (4.646552816, 235.750901442))
            ThreePointArc((4.646552816, 235.750901442), (-7.144342037, 242.184826437), (1.442883572, 252.513434698))
            ThreePointArc((1.442883572, 252.513434698), (12.465004195, 263.96858218), (16.614795754, 279.314160594))
        make_face()
    extrude(amount=-RESSALTO_EXTRUS_O9_DEPTH)

    # Esboço23 → Ressalto-extrusão10 (add)
    with BuildSketch(Plane.XY.offset(2.5).offset(RESSALTO_EXTRUS_O10_START)):
        with BuildLine():
            Line((-20.427812302, 380), (23.83757494, 380))
            ThreePointArc((23.83757494, 380), (27.947184275, 380.72564365), (31.559774958, 382.814814815))
            ThreePointArc((31.559774958, 382.814814815), (36.62592012, 386.220007997), (42.301000601, 388.468258193))
            ThreePointArc((42.301000601, 388.468258193), (11.161749739, 382.566284002), (-20.427812302, 380))
        make_face()
    extrude(amount=RESSALTO_EXTRUS_O10_DEPTH)

    # Esboço24 → Ressalto-extrusão11 (add)
    with BuildSketch(Plane.XY.offset(2.5)):
        with BuildLine():
            ThreePointArc((16.354837382, 283.824974502), (27.263439991, 315.528468743), (55.806257606, 333.118713783))
            ThreePointArc((55.806257606, 333.118713783), (42.982528976, 333.352240694), (31.559774958, 339.185185185))
            ThreePointArc((31.559774958, 339.185185185), (27.947184275, 341.27435635), (23.83757494, 342))
            Line((23.83757494, 342), (8.724247747, 342))
            ThreePointArc((8.724247747, 342), (0.238966372, 338.485281374), (-3.275752253, 330))
            Line((-3.275752253, 330), (-3.275752253, 316.5415667))
            ThreePointArc((-3.275752253, 316.5415667), (-1.832614658, 310.836073192), (2.149690442, 306.502881714))
            ThreePointArc((2.149690442, 306.502881714), (11.736564306, 296.720061653), (16.354837382, 283.824974502))
        make_face()
    extrude(amount=-RESSALTO_EXTRUS_O11_DEPTH)


solid = part.part
